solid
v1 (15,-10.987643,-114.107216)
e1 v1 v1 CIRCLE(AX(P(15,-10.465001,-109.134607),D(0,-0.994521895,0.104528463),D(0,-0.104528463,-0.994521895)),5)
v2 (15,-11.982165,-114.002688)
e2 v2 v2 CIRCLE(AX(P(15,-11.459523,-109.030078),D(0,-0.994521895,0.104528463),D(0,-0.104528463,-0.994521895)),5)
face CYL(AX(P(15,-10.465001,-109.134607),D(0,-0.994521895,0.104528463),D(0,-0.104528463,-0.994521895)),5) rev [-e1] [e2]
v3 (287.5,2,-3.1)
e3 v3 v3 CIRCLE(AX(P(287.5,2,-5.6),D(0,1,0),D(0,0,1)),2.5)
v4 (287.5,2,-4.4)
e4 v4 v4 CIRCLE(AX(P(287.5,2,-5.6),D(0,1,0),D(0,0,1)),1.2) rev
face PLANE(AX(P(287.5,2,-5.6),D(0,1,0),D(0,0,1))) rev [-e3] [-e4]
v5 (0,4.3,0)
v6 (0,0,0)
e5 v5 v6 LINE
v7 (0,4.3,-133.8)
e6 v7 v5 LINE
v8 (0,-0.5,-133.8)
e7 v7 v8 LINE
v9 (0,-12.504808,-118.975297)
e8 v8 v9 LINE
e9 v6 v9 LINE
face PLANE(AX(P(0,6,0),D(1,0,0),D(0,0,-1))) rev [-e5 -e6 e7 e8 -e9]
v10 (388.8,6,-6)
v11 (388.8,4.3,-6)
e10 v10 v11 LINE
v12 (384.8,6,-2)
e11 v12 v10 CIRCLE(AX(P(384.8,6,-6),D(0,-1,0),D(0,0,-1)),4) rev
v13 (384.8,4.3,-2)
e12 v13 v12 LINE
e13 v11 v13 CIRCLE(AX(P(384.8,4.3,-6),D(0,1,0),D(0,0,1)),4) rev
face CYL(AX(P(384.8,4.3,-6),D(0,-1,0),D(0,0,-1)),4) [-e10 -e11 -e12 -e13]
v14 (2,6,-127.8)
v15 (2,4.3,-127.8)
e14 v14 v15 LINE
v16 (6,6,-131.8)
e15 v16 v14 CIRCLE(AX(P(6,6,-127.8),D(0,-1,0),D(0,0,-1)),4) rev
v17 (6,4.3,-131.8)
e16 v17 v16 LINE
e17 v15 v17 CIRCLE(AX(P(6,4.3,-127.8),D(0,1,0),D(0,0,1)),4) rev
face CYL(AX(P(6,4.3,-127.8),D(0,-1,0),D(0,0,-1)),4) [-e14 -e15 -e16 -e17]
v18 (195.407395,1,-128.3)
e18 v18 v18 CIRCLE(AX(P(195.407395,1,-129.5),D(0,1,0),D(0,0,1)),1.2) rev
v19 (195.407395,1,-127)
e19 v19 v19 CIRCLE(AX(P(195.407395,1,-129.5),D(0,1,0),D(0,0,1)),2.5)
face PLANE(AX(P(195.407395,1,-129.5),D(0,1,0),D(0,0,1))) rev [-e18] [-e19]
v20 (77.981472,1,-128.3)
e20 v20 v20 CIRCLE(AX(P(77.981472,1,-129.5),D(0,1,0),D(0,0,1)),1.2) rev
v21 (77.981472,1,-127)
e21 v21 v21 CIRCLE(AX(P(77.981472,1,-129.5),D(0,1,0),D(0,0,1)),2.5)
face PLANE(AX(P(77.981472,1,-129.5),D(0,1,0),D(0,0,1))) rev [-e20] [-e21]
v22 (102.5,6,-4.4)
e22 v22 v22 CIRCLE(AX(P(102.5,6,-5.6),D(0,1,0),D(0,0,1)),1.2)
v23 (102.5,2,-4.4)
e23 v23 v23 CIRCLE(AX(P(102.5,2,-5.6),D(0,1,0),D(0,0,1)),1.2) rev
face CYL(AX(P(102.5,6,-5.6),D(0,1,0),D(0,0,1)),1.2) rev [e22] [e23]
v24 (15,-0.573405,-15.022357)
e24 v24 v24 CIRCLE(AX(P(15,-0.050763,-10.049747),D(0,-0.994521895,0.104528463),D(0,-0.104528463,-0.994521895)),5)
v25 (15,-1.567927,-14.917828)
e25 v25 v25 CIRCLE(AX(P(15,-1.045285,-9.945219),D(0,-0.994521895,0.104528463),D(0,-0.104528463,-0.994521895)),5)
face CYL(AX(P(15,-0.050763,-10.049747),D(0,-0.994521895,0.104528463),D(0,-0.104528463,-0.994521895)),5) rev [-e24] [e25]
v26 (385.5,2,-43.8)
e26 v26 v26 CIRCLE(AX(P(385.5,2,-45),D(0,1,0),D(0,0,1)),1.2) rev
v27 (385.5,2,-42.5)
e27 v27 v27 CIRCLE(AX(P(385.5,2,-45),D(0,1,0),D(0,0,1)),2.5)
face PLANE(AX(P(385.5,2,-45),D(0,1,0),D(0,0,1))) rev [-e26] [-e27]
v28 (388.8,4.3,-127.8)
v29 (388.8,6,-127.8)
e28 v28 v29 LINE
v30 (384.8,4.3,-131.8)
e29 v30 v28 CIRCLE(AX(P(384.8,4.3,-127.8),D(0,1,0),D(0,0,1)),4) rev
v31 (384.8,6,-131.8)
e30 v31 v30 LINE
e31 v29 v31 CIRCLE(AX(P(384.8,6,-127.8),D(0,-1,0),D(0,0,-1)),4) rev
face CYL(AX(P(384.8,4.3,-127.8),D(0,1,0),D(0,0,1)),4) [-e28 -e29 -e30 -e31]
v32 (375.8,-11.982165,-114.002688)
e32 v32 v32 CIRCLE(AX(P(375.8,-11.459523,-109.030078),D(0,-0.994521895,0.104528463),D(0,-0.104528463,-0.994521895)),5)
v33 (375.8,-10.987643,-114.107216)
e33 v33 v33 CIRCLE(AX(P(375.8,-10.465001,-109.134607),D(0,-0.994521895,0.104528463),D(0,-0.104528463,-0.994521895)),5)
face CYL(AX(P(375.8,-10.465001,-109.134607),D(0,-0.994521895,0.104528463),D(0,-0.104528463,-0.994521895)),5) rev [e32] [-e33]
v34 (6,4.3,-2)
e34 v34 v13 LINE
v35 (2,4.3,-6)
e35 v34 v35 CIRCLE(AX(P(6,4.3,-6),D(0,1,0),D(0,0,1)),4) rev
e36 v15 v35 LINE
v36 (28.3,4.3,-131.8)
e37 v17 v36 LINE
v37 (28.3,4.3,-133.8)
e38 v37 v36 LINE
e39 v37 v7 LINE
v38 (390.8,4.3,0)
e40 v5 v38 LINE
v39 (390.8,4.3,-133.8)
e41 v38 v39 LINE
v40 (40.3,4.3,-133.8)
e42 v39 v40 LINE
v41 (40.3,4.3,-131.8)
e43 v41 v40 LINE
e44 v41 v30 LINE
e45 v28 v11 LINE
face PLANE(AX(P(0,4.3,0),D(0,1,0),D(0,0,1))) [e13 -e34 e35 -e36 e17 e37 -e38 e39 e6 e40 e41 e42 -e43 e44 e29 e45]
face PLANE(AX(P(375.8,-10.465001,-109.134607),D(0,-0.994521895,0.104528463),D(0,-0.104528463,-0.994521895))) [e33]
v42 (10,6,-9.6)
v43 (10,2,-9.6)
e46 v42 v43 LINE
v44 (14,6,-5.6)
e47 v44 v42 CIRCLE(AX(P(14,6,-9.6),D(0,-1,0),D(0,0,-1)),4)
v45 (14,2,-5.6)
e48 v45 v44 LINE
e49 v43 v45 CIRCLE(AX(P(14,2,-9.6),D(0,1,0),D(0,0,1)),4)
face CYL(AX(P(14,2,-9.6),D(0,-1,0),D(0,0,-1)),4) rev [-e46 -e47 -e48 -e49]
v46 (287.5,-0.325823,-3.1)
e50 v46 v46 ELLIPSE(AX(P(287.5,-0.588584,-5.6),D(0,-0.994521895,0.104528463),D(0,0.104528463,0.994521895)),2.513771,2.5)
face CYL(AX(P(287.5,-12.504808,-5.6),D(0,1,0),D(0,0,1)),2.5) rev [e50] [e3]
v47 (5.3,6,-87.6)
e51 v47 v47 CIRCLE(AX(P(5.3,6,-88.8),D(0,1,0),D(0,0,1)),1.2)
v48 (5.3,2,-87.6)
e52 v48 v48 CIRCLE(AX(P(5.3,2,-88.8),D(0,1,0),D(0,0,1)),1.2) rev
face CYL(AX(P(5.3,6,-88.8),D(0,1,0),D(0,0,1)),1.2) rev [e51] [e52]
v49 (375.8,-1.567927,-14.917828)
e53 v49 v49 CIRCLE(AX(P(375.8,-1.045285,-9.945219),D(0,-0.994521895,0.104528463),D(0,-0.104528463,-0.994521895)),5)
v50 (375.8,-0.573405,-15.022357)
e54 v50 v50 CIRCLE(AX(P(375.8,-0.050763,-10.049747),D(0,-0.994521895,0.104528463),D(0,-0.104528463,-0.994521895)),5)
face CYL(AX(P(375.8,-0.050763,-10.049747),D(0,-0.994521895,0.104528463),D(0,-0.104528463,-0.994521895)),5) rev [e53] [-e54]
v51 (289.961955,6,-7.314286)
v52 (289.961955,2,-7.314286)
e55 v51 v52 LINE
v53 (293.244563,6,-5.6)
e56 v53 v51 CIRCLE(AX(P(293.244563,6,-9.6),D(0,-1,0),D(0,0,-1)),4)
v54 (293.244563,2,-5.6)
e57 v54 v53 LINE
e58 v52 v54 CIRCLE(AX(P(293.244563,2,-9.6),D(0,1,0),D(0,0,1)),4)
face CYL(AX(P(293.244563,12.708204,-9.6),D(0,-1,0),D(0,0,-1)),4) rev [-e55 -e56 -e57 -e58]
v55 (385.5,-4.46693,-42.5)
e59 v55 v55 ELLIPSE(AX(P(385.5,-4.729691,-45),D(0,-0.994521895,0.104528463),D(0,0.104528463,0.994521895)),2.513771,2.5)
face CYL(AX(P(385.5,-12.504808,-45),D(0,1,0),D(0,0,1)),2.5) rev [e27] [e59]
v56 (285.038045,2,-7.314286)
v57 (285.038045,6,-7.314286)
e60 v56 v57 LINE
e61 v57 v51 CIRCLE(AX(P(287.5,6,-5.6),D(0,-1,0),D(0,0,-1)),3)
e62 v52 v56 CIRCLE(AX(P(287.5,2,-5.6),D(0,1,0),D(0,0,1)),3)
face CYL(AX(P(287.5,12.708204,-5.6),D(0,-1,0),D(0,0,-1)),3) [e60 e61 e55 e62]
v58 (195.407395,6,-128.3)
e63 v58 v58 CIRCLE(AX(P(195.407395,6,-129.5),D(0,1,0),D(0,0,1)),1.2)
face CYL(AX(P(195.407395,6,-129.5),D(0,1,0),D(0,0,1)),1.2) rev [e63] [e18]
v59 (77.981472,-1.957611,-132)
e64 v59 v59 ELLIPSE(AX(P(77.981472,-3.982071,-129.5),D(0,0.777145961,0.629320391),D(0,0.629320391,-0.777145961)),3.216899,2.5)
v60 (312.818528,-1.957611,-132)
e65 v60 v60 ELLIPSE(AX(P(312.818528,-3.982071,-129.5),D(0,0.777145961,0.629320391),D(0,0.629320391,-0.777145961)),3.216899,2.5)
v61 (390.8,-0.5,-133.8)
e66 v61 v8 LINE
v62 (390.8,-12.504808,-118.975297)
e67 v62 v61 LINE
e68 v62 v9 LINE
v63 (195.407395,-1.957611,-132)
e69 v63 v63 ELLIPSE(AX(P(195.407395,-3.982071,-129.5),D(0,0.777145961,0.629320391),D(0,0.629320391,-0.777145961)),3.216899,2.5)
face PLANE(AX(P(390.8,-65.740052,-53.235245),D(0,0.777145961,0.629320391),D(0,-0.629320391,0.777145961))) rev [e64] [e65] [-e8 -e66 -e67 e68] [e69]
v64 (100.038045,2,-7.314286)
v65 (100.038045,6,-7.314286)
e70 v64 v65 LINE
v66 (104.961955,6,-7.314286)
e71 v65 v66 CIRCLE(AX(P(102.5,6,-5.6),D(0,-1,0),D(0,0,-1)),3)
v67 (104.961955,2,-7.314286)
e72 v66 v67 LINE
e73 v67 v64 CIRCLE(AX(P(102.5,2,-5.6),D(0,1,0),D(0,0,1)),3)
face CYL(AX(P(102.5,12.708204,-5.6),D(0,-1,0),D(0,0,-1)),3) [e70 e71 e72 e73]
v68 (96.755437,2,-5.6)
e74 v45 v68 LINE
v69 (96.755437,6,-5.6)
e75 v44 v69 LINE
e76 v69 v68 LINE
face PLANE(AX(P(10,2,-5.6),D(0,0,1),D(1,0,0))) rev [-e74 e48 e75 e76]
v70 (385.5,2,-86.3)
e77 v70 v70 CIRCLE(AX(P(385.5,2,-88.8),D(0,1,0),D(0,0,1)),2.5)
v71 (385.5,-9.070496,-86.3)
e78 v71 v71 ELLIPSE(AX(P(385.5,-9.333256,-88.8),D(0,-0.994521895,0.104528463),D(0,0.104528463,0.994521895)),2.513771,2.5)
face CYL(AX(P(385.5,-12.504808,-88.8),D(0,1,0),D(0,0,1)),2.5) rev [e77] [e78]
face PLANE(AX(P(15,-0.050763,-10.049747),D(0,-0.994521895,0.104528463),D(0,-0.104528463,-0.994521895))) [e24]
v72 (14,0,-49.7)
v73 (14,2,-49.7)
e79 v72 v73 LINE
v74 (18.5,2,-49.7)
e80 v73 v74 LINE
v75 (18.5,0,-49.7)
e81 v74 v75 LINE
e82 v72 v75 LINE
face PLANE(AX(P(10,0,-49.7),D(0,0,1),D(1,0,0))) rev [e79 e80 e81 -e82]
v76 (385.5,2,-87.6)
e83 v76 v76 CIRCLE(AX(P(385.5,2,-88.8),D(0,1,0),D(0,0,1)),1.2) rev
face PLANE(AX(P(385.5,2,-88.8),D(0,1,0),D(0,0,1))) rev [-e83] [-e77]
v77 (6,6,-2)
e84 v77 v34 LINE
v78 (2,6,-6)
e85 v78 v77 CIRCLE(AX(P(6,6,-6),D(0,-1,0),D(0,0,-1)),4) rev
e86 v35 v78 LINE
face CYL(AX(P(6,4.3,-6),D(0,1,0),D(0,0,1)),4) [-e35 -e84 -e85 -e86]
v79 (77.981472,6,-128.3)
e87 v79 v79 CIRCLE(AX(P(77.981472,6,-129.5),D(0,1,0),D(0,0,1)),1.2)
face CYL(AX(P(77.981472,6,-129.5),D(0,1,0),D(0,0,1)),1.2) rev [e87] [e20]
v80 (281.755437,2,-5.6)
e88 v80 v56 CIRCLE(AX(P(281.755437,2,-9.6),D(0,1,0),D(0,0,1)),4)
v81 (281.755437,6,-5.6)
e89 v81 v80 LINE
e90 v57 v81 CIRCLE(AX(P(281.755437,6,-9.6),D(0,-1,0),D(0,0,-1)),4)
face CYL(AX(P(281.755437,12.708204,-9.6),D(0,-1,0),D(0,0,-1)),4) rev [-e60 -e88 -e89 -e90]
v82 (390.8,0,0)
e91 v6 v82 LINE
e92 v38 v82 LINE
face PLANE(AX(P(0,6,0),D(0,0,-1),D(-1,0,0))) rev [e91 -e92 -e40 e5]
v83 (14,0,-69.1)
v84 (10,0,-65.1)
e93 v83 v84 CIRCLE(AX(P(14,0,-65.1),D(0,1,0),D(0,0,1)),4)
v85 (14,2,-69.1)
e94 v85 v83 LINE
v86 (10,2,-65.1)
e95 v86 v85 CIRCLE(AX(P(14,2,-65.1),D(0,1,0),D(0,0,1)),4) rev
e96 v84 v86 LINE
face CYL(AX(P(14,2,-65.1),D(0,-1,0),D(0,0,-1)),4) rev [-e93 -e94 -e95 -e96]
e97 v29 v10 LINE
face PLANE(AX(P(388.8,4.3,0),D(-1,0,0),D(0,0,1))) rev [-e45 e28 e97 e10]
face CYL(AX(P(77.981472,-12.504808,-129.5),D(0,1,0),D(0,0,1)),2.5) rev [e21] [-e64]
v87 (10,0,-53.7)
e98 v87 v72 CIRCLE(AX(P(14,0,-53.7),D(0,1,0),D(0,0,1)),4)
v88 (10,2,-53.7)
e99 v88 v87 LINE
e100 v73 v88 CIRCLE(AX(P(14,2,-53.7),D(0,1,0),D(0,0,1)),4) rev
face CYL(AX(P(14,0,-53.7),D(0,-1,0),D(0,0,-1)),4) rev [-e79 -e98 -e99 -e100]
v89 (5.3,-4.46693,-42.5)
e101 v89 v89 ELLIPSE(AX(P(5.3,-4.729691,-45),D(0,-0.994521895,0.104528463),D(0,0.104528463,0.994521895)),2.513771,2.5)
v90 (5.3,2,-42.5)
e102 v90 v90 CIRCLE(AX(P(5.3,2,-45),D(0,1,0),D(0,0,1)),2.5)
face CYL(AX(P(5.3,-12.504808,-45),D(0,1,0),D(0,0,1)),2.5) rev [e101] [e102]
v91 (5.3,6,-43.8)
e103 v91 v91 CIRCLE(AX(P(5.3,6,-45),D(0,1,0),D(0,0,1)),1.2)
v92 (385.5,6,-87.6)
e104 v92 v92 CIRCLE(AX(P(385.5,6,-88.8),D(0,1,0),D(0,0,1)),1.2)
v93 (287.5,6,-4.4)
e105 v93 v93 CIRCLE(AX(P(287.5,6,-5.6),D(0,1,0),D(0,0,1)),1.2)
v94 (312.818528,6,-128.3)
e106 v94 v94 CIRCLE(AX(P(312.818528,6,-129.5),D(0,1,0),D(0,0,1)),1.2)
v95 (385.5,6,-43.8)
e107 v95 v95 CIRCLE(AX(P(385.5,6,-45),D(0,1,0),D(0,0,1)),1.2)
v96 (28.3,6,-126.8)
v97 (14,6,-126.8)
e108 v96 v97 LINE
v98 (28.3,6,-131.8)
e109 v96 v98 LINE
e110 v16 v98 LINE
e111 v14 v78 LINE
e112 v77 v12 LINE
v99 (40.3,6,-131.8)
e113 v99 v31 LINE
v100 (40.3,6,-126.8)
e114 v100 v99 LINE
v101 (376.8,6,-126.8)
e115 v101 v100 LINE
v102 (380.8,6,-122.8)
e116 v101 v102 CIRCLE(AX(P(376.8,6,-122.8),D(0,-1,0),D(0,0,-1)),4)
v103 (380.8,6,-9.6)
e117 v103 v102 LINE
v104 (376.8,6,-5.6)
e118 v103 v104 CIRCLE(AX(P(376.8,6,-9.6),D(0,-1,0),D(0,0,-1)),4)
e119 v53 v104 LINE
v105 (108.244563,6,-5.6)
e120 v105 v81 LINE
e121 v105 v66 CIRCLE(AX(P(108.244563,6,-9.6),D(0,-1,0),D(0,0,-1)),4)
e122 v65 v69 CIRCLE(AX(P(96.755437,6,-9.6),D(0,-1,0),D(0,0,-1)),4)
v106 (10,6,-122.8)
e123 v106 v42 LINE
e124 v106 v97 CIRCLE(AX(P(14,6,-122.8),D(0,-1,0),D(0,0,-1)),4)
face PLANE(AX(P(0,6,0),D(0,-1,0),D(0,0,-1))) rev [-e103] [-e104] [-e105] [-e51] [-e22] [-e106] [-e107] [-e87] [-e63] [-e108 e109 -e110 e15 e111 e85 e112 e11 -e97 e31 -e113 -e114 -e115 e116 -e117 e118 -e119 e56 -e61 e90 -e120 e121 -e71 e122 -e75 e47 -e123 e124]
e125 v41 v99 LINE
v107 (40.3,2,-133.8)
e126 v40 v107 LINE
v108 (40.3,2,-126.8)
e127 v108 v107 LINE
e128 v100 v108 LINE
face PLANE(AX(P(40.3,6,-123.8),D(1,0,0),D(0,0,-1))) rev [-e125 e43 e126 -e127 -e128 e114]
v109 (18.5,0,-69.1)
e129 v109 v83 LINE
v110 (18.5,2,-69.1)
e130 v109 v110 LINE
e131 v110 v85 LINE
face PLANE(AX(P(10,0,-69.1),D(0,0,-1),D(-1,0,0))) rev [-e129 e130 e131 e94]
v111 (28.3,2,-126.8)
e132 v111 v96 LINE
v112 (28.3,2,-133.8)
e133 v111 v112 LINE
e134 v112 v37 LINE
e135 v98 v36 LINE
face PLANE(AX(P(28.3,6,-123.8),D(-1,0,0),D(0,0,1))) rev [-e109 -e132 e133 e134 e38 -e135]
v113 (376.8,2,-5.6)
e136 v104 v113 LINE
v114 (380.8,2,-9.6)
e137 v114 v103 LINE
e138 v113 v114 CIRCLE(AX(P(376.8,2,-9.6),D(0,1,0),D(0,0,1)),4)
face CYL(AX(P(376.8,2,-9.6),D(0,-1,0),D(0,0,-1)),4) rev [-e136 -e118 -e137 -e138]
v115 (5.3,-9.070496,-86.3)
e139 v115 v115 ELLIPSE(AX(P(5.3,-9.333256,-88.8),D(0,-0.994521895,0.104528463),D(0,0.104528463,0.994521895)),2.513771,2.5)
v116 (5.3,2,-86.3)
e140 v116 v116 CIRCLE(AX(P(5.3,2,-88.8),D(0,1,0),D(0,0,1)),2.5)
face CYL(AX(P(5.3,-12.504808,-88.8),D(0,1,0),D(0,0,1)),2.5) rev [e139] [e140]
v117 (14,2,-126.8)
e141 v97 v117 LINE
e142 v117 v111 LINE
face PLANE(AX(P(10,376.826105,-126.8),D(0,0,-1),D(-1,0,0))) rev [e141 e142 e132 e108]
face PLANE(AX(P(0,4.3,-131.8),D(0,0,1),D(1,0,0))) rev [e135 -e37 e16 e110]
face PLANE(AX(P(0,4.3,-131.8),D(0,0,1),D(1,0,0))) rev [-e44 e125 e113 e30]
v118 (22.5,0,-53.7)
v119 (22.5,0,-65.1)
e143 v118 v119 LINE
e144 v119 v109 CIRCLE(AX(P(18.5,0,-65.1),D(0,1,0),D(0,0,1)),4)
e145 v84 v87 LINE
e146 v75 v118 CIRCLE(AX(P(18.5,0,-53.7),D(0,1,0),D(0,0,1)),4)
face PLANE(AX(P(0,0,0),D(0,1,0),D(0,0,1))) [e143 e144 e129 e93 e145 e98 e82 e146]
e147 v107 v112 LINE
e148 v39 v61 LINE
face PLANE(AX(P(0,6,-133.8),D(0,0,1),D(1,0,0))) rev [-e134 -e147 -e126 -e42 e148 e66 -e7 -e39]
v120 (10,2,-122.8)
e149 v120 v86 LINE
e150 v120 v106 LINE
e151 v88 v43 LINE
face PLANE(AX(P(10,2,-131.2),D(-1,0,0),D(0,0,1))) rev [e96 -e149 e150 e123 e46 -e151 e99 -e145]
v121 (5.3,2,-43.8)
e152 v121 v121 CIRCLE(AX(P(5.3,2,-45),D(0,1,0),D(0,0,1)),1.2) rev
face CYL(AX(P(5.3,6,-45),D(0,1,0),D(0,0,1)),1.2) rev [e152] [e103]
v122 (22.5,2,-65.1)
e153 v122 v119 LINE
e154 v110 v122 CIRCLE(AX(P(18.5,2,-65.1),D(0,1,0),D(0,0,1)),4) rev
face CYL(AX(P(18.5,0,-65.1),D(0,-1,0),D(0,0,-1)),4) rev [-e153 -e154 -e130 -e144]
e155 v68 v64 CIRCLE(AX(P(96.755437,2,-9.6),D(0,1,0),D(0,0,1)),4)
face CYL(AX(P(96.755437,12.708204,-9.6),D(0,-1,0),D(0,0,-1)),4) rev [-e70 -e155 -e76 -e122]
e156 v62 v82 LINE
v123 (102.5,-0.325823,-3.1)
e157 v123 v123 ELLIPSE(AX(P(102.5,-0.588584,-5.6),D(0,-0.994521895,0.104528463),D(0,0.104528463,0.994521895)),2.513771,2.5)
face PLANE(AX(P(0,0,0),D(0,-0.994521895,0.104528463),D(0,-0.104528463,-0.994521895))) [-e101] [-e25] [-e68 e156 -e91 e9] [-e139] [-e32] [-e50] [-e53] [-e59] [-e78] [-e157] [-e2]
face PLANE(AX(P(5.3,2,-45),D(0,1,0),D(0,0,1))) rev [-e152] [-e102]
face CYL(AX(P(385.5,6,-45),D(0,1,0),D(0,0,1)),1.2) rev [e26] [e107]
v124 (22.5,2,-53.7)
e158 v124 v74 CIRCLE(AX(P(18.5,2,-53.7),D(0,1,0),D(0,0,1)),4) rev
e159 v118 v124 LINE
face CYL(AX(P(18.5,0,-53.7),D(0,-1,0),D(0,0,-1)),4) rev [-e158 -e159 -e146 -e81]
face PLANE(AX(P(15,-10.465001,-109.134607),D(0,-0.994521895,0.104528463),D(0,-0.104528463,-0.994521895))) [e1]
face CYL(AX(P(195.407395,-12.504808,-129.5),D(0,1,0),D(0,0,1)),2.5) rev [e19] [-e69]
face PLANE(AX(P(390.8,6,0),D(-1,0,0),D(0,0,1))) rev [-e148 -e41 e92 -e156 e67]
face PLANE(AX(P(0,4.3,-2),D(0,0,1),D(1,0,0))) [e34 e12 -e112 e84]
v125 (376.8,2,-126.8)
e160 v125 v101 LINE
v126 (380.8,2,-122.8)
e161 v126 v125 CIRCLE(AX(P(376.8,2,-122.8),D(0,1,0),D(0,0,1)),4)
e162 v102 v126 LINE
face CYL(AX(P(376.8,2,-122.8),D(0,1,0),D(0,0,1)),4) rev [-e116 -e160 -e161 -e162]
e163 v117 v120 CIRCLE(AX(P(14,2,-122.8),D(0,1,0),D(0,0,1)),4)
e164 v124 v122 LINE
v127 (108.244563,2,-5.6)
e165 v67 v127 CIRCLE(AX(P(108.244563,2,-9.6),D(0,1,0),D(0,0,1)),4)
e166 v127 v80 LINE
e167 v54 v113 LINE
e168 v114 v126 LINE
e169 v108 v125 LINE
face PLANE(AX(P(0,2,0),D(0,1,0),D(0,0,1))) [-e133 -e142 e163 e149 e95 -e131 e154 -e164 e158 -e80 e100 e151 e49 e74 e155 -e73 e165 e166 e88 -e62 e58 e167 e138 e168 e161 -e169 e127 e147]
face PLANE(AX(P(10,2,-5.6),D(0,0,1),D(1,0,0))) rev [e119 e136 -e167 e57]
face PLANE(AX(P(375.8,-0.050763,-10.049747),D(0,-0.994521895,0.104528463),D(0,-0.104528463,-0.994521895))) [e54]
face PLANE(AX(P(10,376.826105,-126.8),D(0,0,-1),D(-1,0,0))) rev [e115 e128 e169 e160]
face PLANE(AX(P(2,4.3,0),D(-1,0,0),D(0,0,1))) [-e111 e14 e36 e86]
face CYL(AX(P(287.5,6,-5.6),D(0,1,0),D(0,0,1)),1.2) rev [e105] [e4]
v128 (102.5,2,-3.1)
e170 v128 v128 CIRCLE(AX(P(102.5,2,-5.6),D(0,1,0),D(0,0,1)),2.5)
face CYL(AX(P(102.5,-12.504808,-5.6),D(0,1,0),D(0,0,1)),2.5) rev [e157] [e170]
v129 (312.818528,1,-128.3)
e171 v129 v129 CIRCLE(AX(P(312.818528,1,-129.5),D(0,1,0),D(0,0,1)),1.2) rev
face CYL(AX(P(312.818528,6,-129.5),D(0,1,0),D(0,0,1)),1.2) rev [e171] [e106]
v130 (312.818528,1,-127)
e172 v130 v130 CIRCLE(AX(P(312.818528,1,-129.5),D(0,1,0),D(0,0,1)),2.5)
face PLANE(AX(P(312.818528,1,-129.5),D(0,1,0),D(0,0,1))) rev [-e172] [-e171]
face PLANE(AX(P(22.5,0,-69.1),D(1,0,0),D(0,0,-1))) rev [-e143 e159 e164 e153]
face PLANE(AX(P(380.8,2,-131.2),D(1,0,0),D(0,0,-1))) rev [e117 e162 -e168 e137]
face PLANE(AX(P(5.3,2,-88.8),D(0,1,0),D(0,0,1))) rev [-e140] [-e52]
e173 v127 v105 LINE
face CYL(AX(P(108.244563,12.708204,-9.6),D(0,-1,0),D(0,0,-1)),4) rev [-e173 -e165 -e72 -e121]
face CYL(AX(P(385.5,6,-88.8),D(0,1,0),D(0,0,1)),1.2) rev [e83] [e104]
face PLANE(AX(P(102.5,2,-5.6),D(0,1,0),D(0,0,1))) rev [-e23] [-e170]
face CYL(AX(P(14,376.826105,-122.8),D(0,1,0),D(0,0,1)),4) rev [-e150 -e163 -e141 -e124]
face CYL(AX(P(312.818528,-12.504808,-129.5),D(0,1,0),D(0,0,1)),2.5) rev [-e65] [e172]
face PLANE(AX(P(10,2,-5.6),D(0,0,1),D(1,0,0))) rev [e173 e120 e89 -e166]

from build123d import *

# Parameters (mm, degrees)
SKETCH1_W               = 390.8
SKETCH1_H               = 133.8
BOSS_EXTRUDE1_DEPTH     = 6
SKETCH2_W               = 370.8
SKETCH2_H               = 125.6
CUT_EXTRUDE1_DEPTH      = 4
BOSS_EXTRUDE3_DEPTH     = 390.8
BOSS_EXTRUDE4_DEPTH     = 4
CUT_EXTRUDE6_DEPTH      = 414.309625425
CUT_EXTRUDE6_DEPTH_BACK = 414.309625425
SKETCH15_R              = 5
CUT_EXTRUDE8_DEPTH      = 1
SKETCH16_W              = 12.5
SKETCH16_H              = 19.4
CUT_EXTRUDE9_DEPTH      = 6
SKETCH17_W              = 390.8
SKETCH17_H              = 133.8
SKETCH17_W_2            = 386.8
SKETCH17_H_2            = 129.8
CUT_EXTRUDE10_DEPTH     = 1.7
SKETCH18_W              = 370.8
SKETCH18_H              = 4.4
BOSS_EXTRUDE5_DEPTH     = 4
M2_CLEARANCE_HOLE1_D    = 2.4
CUT_EXTRUDE7_START      = -4
SKETCH13_R              = 2.5
CUT_EXTRUDE7_DEPTH      = 410.484592101
CUT_EXTRUDE11_START     = -5
SKETCH19_R              = 2.5
CUT_EXTRUDE11_DEPTH     = 409.484592101
SKETCH20_W              = 12
SKETCH20_H              = 4
CUT_EXTRUDE12_DEPTH     = 10
FILLET1_R               = 4
FILLET2_R               = 4


# Read off the part's stored shape, not the designer's step: Boss-Extrude3
with BuildPart() as part:
    # Sketch1 → Boss-Extrude1 (new body)
    with BuildSketch(Plane(origin=(0, 0, 0), x_dir=(1, 0, 0), z_dir=(0, 1, 0))):
        with Locations((195.4, 66.9)):
            Rectangle(SKETCH1_W, SKETCH1_H)
    extrude(amount=BOSS_EXTRUDE1_DEPTH)

    # Sketch2 → Cut-Extrude1 (cut)
    with BuildSketch(Plane(origin=(0, 6, 0), x_dir=(1, 0, 0), z_dir=(0, 1, 0))):
        with Locations((195.4, 68.4)):
            Rectangle(SKETCH2_W, SKETCH2_H)
    extrude(amount=-CUT_EXTRUDE1_DEPTH, mode=Mode.SUBTRACT)

    # Boss-Extrude3 outline → Boss-Extrude3 (add)
    with BuildSketch(Plane.YZ):
        Polygon((-14.062946679, -133.8), (0, -133.8), (0, 0), align=None)
    extrude(amount=BOSS_EXTRUDE3_DEPTH)

    # Sketch10 → Boss-Extrude4 (add)
    with BuildSketch(Plane(origin=(0, 2, 0), x_dir=(1, 0, 0), z_dir=(0, 1, 0))):
        with BuildLine():
            ThreePointArc((290.5, 5.6), (287.5, 8.6), (284.5, 5.6))
            Line((284.5, 5.6), (290.5, 5.6))
        make_face()
        with BuildLine():
            Line((290.5, 5.6), (284.5, 5.6))
            ThreePointArc((284.5, 5.6), (287.5, 2.6), (290.5, 5.6))
        make_face()
        with BuildLine():
            Line((99.5, 5.6), (105.5, 5.6))
            ThreePointArc((105.5, 5.6), (102.5, 8.6), (99.5, 5.6))
        make_face()
        with BuildLine():
            ThreePointArc((99.5, 5.6), (102.5, 2.6), (105.5, 5.6))
            Line((105.5, 5.6), (99.5, 5.6))
        make_face()
    extrude(amount=BOSS_EXTRUDE4_DEPTH)

    # Sketch12 → Cut-Extrude6 (cut, two sides: drawn at the far end of the back side and taken through both)
    with BuildSketch(Plane.ZY.offset(-CUT_EXTRUDE6_DEPTH_BACK)):
        Polygon((-133.8, -14.062946679), (-118.975297196, -12.504807627), (-133.8, -0.5), align=None)
    extrude(amount=CUT_EXTRUDE6_DEPTH + CUT_EXTRUDE6_DEPTH_BACK, mode=Mode.SUBTRACT)

    # Sketch15 → Cut-Extrude8 (cut)
    with BuildSketch(Plane(origin=(0, 0, 0), x_dir=(1, 0, 0), z_dir=(0, -0.9945218953682742, 0.10452846326764666))):
        with Locations(Location((15, -109.630646394, 0), (0, 0, 270))):
            Circle(SKETCH15_R)
        with Locations(Location((375.8, -109.630646394, 0), (0, 0, 270))):
            Circle(SKETCH15_R)
        with Locations(Location((15, -10, 0), (0, 0, 270))):
            Circle(SKETCH15_R)
        with Locations(Location((375.8, -10, 0), (0, 0, 270))):
            Circle(SKETCH15_R)
    extrude(amount=-CUT_EXTRUDE8_DEPTH, mode=Mode.SUBTRACT)

    # Sketch16 → Cut-Extrude9 (cut)
    with BuildSketch(Plane(origin=(0, 6, 0), x_dir=(1, 0, 0), z_dir=(0, 1, 0))):
        with Locations((16.25, 59.4)):
            Rectangle(SKETCH16_W, SKETCH16_H)
    extrude(amount=-CUT_EXTRUDE9_DEPTH, mode=Mode.SUBTRACT)

    # Sketch17 → Cut-Extrude10 (cut)
    with BuildSketch(Plane(origin=(0, 6, 0), x_dir=(1, 0, 0), z_dir=(0, 1, 0))):
        with Locations((195.4, 66.9)):
            Rectangle(SKETCH17_W, SKETCH17_H)
        with Locations((195.4, 66.9)):
            Rectangle(SKETCH17_W_2, SKETCH17_H_2, mode=Mode.SUBTRACT)
    extrude(amount=-CUT_EXTRUDE10_DEPTH, mode=Mode.SUBTRACT)

    # Sketch18 → Boss-Extrude5 (add)
    with BuildSketch(Plane(origin=(0, 2, 0), x_dir=(1, 0, 0), z_dir=(0, 1, 0))):
        with Locations((195.4, 129)):
            Rectangle(SKETCH18_W, SKETCH18_H)
    extrude(amount=BOSS_EXTRUDE5_DEPTH)

    # M2 Clearance Hole1 (through all)
    with Locations(Plane(origin=(102.5, 6, -5.6), x_dir=(0, 0, 1), z_dir=(0, 1, 0))):
        with Locations((0, 0), (-39.4, -97.2), (-83.2, -97.2), (-83.2, 283), (-39.4, 283), (0, 185), (-123.9, 92.907395227), (-123.9, -24.518527842), (-123.9, 210.318527842)):
            Hole(M2_CLEARANCE_HOLE1_D / 2)

    # Sketch13 → Cut-Extrude7 (cut, through all)
    with BuildSketch(Plane(origin=(0, 6, 0), x_dir=(1, 0, 0), z_dir=(0, 1, 0)).offset(CUT_EXTRUDE7_START)):
        with Locations(Location((5.3, 45, 0), (0, 0, 270))):
            Circle(SKETCH13_R)
        with Locations(Location((5.3, 88.8, 0), (0, 0, 270))):
            Circle(SKETCH13_R)
        with Locations(Location((102.5, 5.6, 0), (0, 0, 270))):
            Circle(SKETCH13_R)
        with Locations(Location((287.5, 5.6, 0), (0, 0, 270))):
            Circle(SKETCH13_R)
        with Locations(Location((385.5, 45, 0), (0, 0, 270))):
            Circle(SKETCH13_R)
        with Locations(Location((385.5, 88.8, 0), (0, 0, 270))):
            Circle(SKETCH13_R)
    extrude(amount=-CUT_EXTRUDE7_DEPTH, mode=Mode.SUBTRACT)

    # Sketch19 → Cut-Extrude11 (cut, through all)
    with BuildSketch(Plane(origin=(0, 6, 0), x_dir=(1, 0, 0), z_dir=(0, 1, 0)).offset(CUT_EXTRUDE11_START)):
        with Locations(Location((77.981472158, 129.5, 0), (0, 0, 270))):
            Circle(SKETCH19_R)
        with Locations(Location((195.407395227, 129.5, 0), (0, 0, 270))):
            Circle(SKETCH19_R)
        with Locations(Location((312.818527842, 129.5, 0), (0, 0, 270))):
            Circle(SKETCH19_R)
    extrude(amount=-CUT_EXTRUDE11_DEPTH, mode=Mode.SUBTRACT)

    # Sketch20 → Cut-Extrude12 (cut)
    with BuildSketch(Plane(origin=(0, 0, -133.8), x_dir=(-1, 0, 0), z_dir=(0, 0, -1))):
        with Locations((-34.3, 4)):
            Rectangle(SKETCH20_W, SKETCH20_H)
    extrude(amount=-CUT_EXTRUDE12_DEPTH, mode=Mode.SUBTRACT)

    # Fillet1
    fillet1_edges = [part.edges().sort_by_distance(p)[0] for p in [
        (2, 5.15, -131.8),
        (2, 5.15, -2),
        (388.8, 5.15, -2),
        (388.8, 5.15, -131.8),
        (380.8, 4, -126.8),
        (10, 4, -126.8),
        (10, 4, -5.6),
        (380.8, 4, -5.6),
        (10, 1, -49.7),
        (10, 1, -69.1),
        (22.5, 1, -69.1),
        (22.5, 1, -49.7),
    ]]
    fillet(fillet1_edges, radius=FILLET1_R)

    # Fillet2
    fillet2_edges = [part.edges().sort_by_distance(p)[0] for p in [
        (290.5, 4, -5.6),
        (284.5, 4, -5.6),
        (105.5, 4, -5.6),
        (99.5, 4, -5.6),
    ]]
    fillet(fillet2_edges, radius=FILLET2_R)


solid = part.part
